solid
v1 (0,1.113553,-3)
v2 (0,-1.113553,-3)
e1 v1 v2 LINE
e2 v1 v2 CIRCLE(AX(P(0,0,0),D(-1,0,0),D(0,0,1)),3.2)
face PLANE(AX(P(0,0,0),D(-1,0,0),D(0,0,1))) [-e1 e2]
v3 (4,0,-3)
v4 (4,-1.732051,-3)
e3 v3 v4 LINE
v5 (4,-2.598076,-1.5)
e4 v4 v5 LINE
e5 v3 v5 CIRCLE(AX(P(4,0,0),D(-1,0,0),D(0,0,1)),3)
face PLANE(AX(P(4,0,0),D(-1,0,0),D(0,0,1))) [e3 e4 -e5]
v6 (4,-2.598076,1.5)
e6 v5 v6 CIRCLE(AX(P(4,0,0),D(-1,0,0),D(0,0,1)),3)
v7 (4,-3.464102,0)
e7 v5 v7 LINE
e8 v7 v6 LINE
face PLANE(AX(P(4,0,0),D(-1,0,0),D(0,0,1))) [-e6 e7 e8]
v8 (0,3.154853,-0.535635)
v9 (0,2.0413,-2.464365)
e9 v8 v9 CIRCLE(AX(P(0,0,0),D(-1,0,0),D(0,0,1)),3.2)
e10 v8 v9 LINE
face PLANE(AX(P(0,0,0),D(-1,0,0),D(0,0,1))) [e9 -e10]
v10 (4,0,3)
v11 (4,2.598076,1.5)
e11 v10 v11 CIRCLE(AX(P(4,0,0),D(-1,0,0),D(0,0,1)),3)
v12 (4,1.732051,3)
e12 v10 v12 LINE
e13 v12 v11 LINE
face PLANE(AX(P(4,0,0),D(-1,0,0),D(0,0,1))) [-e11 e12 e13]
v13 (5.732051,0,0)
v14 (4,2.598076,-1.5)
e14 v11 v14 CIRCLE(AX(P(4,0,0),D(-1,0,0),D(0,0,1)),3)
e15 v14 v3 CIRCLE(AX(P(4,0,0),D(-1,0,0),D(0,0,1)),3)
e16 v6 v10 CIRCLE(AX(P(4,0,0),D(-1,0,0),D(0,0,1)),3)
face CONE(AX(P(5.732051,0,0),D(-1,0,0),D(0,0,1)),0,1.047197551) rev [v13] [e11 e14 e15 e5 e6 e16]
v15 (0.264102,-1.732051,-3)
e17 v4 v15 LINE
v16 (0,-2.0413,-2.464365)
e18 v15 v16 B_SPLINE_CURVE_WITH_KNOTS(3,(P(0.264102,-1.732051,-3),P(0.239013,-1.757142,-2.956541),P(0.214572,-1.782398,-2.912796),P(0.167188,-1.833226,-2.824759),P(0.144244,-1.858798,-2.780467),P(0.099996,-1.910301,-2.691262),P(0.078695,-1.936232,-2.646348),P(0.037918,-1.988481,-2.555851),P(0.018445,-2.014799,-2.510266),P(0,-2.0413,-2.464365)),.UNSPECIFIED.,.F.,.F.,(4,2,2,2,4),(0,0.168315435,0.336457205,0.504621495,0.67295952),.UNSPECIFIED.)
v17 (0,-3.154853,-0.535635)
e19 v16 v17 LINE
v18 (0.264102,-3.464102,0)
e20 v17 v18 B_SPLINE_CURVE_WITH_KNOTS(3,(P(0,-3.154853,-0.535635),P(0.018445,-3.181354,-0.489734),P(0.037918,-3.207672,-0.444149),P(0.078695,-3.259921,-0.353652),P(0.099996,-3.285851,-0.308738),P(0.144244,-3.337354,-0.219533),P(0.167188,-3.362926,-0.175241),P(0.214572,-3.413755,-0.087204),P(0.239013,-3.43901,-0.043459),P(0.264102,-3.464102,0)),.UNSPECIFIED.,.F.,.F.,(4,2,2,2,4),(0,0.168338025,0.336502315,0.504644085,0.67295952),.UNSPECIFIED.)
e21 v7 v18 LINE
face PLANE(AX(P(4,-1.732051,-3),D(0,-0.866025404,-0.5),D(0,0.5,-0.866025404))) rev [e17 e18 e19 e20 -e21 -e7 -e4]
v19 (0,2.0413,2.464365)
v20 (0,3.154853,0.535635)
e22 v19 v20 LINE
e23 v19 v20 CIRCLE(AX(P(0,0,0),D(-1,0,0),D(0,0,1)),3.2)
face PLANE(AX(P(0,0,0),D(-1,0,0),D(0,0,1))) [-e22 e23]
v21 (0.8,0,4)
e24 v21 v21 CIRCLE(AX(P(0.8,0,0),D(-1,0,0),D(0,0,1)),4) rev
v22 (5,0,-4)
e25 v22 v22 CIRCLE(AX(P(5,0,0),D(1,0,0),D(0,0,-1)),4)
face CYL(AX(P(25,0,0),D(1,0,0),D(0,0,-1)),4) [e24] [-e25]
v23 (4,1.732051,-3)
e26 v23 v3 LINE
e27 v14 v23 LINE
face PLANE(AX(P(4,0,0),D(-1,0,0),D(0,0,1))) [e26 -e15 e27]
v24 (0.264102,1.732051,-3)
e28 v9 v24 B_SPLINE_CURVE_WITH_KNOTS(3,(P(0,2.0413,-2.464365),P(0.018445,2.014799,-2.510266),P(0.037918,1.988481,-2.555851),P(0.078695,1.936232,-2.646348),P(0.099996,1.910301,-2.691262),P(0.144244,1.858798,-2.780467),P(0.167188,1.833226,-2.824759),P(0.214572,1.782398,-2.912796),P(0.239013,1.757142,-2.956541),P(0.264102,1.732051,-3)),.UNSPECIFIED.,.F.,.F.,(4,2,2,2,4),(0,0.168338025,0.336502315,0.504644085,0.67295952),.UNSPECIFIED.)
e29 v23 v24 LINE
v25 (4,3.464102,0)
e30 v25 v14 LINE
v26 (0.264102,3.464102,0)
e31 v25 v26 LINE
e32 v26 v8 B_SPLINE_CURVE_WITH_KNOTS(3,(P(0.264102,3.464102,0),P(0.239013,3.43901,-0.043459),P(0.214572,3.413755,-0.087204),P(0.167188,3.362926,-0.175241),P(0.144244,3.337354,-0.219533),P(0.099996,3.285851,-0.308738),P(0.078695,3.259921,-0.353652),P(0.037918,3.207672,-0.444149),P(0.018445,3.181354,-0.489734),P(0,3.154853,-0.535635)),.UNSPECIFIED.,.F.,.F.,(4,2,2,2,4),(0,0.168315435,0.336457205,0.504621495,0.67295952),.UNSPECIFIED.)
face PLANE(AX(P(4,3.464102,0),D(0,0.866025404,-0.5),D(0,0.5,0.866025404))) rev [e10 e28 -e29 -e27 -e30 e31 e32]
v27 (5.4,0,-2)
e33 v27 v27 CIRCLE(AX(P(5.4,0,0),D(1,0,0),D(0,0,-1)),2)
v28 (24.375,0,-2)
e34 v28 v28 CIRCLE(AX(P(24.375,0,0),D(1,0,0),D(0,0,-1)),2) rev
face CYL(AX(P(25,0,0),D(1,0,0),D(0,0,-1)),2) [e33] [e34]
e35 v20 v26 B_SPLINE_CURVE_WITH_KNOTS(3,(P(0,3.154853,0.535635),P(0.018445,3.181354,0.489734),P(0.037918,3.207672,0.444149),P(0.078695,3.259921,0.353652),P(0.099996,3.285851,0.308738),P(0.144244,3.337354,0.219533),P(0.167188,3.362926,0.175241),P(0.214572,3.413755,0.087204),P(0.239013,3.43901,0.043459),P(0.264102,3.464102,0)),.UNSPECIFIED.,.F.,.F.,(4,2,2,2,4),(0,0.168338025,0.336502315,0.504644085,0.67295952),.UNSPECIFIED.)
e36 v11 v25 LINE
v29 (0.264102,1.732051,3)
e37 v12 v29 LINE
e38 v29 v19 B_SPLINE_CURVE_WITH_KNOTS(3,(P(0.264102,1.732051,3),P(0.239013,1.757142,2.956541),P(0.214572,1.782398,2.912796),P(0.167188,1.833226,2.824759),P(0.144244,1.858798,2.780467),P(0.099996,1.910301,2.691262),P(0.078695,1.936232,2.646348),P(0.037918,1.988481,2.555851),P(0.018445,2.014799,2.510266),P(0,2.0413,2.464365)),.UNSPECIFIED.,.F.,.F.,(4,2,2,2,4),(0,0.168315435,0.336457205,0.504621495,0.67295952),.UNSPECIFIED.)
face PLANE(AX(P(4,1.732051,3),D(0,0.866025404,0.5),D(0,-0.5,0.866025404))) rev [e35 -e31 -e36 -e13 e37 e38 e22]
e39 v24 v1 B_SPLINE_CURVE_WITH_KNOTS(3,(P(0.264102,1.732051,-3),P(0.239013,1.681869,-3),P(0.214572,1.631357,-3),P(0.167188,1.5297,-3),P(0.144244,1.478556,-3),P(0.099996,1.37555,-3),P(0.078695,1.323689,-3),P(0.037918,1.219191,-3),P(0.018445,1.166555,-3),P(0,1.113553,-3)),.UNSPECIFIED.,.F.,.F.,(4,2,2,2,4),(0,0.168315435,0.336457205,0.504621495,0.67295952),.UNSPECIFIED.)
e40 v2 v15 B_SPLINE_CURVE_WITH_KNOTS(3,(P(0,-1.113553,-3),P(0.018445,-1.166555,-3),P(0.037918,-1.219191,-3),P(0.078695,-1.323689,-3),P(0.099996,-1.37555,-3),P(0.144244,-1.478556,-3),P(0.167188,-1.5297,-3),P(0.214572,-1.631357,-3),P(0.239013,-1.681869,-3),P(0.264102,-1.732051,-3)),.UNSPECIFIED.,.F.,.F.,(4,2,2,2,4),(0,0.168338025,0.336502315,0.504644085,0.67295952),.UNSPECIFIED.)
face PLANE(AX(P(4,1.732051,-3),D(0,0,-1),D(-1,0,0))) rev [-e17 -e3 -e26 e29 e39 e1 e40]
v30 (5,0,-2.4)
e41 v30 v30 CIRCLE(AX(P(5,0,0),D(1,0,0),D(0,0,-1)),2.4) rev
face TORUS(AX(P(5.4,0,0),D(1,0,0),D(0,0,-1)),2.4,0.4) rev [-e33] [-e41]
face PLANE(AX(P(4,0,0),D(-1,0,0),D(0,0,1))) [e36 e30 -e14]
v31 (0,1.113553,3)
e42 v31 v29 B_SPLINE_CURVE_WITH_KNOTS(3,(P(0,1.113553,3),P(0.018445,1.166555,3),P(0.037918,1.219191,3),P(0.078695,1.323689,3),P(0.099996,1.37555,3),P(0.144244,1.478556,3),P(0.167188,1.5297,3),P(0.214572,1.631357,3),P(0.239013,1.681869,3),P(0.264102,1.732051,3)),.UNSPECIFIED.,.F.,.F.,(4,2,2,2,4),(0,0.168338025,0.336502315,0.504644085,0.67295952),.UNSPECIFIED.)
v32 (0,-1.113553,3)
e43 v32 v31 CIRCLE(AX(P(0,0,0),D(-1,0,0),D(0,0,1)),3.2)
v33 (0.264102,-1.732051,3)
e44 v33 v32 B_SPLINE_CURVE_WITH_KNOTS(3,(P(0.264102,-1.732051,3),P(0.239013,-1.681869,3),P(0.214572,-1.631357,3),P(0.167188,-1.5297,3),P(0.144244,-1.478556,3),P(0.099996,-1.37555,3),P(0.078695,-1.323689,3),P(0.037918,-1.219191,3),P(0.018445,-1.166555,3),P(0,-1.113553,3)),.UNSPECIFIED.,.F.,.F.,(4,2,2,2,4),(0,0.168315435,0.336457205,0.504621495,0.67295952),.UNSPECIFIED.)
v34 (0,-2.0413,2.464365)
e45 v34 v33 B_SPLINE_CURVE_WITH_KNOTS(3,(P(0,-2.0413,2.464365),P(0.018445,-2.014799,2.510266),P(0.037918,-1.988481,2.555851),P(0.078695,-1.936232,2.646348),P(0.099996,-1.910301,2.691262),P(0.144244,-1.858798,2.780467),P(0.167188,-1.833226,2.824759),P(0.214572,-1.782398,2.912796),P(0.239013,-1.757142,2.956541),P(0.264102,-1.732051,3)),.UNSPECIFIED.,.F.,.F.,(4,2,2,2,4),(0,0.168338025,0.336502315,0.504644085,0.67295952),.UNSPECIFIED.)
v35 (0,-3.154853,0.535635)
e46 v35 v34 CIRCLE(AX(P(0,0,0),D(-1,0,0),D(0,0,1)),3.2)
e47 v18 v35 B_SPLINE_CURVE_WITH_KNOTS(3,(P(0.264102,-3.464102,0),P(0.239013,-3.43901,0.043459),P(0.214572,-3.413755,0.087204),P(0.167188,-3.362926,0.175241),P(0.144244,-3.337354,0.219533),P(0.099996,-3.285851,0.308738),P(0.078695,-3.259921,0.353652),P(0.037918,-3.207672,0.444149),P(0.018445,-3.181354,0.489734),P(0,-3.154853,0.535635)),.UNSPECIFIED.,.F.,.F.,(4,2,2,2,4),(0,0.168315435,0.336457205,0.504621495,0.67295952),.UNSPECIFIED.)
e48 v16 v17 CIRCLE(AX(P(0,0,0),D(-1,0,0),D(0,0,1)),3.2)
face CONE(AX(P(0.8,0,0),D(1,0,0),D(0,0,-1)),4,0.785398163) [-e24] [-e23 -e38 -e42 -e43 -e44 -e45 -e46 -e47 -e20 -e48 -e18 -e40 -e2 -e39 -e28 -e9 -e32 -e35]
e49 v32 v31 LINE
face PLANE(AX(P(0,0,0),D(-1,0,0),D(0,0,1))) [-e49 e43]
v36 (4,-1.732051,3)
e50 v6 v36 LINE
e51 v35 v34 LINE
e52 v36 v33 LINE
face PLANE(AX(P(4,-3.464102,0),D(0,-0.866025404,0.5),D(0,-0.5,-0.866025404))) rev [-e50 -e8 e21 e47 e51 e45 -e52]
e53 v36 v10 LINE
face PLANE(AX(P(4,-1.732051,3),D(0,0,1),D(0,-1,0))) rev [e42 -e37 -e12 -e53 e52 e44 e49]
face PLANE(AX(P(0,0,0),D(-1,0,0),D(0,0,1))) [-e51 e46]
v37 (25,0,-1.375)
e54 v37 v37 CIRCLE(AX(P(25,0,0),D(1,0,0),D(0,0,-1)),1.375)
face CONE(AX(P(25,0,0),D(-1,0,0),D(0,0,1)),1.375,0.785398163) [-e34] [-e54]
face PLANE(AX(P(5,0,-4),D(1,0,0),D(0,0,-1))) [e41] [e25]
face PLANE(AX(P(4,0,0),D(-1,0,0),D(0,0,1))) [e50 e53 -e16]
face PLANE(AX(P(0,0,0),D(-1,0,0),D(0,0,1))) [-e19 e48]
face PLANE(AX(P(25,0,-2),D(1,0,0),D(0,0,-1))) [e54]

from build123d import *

# Parameters (mm, degrees)
CHAMFER1_SIZE      = 0.625
CUT_EXTRUDE1_DEPTH = 4
CHAMFER2_SIZE      = 0.8
FILLET1_R          = 0.4


with BuildPart() as part:
    # Sketch1 → Revolve1 (revolve)
    with BuildSketch(Plane(origin=(0, 0, 0), x_dir=(1, 0, 0), z_dir=(0, 1, 0))):
        Polygon((0, 0), (0, 4), (5, 4), (5, 2), (25, 2), (25, 0), align=None)
    revolve(axis=Axis((25, 0, 0), (-1, 0, 0)))

    # Chamfer1
    chamfer1_edges = [part.edges().sort_by_distance(p)[0] for p in [
        (25, 0, 2),
    ]]
    chamfer(chamfer1_edges, length=CHAMFER1_SIZE)

    # Sketch3 → Cut-Revolve1 (revolve, cut)
    with BuildSketch(Plane(origin=(0, 0, 0), x_dir=(1, 0, 0), z_dir=(0, 1, 0)), mode=Mode.PRIVATE) as cut_revolve1_sk:
        Polygon((0, 0), (5.732050808, 0), (4, 3), (0, 3), align=None)
    revolve(cut_revolve1_sk.sketch.rotate(Axis((0, 0, 0), (1, 0, 0)), 180), axis=Axis((0, 0, 0), (1, 0, 0)), mode=Mode.SUBTRACT)

    # Sketch2 → Cut-Extrude1 (cut)
    with BuildSketch(Plane.ZY):
        Polygon((0, 3.464101615), (-3, 1.732050808), (-3, -1.732050808), (0, -3.464101615), (3, -1.732050808), (3, 1.732050808), align=None)
    extrude(amount=-CUT_EXTRUDE1_DEPTH, mode=Mode.SUBTRACT)

    # Chamfer2
    # the kernel refuses this chamfer: 0.8 mm, written as the material it takes off along each edge
    with BuildSketch(Plane(origin=(0, 0, 0), x_dir=(0, 0, -1), z_dir=(0, 1, 0))) as chamfer2_piece_1:
        Polygon((4, -CHAMFER2_SIZE), (4 - CHAMFER2_SIZE, 0), (4, 0), align=None)
    revolve(axis=Axis((0, 0, 0), (-1, 0, 0)), mode=Mode.SUBTRACT)

    # Fillet1
    fillet1_edges = [part.edges().sort_by_distance(p)[0] for p in [
        (5, 0, 2),
    ]]
    fillet(fillet1_edges, radius=FILLET1_R)


solid = part.part
